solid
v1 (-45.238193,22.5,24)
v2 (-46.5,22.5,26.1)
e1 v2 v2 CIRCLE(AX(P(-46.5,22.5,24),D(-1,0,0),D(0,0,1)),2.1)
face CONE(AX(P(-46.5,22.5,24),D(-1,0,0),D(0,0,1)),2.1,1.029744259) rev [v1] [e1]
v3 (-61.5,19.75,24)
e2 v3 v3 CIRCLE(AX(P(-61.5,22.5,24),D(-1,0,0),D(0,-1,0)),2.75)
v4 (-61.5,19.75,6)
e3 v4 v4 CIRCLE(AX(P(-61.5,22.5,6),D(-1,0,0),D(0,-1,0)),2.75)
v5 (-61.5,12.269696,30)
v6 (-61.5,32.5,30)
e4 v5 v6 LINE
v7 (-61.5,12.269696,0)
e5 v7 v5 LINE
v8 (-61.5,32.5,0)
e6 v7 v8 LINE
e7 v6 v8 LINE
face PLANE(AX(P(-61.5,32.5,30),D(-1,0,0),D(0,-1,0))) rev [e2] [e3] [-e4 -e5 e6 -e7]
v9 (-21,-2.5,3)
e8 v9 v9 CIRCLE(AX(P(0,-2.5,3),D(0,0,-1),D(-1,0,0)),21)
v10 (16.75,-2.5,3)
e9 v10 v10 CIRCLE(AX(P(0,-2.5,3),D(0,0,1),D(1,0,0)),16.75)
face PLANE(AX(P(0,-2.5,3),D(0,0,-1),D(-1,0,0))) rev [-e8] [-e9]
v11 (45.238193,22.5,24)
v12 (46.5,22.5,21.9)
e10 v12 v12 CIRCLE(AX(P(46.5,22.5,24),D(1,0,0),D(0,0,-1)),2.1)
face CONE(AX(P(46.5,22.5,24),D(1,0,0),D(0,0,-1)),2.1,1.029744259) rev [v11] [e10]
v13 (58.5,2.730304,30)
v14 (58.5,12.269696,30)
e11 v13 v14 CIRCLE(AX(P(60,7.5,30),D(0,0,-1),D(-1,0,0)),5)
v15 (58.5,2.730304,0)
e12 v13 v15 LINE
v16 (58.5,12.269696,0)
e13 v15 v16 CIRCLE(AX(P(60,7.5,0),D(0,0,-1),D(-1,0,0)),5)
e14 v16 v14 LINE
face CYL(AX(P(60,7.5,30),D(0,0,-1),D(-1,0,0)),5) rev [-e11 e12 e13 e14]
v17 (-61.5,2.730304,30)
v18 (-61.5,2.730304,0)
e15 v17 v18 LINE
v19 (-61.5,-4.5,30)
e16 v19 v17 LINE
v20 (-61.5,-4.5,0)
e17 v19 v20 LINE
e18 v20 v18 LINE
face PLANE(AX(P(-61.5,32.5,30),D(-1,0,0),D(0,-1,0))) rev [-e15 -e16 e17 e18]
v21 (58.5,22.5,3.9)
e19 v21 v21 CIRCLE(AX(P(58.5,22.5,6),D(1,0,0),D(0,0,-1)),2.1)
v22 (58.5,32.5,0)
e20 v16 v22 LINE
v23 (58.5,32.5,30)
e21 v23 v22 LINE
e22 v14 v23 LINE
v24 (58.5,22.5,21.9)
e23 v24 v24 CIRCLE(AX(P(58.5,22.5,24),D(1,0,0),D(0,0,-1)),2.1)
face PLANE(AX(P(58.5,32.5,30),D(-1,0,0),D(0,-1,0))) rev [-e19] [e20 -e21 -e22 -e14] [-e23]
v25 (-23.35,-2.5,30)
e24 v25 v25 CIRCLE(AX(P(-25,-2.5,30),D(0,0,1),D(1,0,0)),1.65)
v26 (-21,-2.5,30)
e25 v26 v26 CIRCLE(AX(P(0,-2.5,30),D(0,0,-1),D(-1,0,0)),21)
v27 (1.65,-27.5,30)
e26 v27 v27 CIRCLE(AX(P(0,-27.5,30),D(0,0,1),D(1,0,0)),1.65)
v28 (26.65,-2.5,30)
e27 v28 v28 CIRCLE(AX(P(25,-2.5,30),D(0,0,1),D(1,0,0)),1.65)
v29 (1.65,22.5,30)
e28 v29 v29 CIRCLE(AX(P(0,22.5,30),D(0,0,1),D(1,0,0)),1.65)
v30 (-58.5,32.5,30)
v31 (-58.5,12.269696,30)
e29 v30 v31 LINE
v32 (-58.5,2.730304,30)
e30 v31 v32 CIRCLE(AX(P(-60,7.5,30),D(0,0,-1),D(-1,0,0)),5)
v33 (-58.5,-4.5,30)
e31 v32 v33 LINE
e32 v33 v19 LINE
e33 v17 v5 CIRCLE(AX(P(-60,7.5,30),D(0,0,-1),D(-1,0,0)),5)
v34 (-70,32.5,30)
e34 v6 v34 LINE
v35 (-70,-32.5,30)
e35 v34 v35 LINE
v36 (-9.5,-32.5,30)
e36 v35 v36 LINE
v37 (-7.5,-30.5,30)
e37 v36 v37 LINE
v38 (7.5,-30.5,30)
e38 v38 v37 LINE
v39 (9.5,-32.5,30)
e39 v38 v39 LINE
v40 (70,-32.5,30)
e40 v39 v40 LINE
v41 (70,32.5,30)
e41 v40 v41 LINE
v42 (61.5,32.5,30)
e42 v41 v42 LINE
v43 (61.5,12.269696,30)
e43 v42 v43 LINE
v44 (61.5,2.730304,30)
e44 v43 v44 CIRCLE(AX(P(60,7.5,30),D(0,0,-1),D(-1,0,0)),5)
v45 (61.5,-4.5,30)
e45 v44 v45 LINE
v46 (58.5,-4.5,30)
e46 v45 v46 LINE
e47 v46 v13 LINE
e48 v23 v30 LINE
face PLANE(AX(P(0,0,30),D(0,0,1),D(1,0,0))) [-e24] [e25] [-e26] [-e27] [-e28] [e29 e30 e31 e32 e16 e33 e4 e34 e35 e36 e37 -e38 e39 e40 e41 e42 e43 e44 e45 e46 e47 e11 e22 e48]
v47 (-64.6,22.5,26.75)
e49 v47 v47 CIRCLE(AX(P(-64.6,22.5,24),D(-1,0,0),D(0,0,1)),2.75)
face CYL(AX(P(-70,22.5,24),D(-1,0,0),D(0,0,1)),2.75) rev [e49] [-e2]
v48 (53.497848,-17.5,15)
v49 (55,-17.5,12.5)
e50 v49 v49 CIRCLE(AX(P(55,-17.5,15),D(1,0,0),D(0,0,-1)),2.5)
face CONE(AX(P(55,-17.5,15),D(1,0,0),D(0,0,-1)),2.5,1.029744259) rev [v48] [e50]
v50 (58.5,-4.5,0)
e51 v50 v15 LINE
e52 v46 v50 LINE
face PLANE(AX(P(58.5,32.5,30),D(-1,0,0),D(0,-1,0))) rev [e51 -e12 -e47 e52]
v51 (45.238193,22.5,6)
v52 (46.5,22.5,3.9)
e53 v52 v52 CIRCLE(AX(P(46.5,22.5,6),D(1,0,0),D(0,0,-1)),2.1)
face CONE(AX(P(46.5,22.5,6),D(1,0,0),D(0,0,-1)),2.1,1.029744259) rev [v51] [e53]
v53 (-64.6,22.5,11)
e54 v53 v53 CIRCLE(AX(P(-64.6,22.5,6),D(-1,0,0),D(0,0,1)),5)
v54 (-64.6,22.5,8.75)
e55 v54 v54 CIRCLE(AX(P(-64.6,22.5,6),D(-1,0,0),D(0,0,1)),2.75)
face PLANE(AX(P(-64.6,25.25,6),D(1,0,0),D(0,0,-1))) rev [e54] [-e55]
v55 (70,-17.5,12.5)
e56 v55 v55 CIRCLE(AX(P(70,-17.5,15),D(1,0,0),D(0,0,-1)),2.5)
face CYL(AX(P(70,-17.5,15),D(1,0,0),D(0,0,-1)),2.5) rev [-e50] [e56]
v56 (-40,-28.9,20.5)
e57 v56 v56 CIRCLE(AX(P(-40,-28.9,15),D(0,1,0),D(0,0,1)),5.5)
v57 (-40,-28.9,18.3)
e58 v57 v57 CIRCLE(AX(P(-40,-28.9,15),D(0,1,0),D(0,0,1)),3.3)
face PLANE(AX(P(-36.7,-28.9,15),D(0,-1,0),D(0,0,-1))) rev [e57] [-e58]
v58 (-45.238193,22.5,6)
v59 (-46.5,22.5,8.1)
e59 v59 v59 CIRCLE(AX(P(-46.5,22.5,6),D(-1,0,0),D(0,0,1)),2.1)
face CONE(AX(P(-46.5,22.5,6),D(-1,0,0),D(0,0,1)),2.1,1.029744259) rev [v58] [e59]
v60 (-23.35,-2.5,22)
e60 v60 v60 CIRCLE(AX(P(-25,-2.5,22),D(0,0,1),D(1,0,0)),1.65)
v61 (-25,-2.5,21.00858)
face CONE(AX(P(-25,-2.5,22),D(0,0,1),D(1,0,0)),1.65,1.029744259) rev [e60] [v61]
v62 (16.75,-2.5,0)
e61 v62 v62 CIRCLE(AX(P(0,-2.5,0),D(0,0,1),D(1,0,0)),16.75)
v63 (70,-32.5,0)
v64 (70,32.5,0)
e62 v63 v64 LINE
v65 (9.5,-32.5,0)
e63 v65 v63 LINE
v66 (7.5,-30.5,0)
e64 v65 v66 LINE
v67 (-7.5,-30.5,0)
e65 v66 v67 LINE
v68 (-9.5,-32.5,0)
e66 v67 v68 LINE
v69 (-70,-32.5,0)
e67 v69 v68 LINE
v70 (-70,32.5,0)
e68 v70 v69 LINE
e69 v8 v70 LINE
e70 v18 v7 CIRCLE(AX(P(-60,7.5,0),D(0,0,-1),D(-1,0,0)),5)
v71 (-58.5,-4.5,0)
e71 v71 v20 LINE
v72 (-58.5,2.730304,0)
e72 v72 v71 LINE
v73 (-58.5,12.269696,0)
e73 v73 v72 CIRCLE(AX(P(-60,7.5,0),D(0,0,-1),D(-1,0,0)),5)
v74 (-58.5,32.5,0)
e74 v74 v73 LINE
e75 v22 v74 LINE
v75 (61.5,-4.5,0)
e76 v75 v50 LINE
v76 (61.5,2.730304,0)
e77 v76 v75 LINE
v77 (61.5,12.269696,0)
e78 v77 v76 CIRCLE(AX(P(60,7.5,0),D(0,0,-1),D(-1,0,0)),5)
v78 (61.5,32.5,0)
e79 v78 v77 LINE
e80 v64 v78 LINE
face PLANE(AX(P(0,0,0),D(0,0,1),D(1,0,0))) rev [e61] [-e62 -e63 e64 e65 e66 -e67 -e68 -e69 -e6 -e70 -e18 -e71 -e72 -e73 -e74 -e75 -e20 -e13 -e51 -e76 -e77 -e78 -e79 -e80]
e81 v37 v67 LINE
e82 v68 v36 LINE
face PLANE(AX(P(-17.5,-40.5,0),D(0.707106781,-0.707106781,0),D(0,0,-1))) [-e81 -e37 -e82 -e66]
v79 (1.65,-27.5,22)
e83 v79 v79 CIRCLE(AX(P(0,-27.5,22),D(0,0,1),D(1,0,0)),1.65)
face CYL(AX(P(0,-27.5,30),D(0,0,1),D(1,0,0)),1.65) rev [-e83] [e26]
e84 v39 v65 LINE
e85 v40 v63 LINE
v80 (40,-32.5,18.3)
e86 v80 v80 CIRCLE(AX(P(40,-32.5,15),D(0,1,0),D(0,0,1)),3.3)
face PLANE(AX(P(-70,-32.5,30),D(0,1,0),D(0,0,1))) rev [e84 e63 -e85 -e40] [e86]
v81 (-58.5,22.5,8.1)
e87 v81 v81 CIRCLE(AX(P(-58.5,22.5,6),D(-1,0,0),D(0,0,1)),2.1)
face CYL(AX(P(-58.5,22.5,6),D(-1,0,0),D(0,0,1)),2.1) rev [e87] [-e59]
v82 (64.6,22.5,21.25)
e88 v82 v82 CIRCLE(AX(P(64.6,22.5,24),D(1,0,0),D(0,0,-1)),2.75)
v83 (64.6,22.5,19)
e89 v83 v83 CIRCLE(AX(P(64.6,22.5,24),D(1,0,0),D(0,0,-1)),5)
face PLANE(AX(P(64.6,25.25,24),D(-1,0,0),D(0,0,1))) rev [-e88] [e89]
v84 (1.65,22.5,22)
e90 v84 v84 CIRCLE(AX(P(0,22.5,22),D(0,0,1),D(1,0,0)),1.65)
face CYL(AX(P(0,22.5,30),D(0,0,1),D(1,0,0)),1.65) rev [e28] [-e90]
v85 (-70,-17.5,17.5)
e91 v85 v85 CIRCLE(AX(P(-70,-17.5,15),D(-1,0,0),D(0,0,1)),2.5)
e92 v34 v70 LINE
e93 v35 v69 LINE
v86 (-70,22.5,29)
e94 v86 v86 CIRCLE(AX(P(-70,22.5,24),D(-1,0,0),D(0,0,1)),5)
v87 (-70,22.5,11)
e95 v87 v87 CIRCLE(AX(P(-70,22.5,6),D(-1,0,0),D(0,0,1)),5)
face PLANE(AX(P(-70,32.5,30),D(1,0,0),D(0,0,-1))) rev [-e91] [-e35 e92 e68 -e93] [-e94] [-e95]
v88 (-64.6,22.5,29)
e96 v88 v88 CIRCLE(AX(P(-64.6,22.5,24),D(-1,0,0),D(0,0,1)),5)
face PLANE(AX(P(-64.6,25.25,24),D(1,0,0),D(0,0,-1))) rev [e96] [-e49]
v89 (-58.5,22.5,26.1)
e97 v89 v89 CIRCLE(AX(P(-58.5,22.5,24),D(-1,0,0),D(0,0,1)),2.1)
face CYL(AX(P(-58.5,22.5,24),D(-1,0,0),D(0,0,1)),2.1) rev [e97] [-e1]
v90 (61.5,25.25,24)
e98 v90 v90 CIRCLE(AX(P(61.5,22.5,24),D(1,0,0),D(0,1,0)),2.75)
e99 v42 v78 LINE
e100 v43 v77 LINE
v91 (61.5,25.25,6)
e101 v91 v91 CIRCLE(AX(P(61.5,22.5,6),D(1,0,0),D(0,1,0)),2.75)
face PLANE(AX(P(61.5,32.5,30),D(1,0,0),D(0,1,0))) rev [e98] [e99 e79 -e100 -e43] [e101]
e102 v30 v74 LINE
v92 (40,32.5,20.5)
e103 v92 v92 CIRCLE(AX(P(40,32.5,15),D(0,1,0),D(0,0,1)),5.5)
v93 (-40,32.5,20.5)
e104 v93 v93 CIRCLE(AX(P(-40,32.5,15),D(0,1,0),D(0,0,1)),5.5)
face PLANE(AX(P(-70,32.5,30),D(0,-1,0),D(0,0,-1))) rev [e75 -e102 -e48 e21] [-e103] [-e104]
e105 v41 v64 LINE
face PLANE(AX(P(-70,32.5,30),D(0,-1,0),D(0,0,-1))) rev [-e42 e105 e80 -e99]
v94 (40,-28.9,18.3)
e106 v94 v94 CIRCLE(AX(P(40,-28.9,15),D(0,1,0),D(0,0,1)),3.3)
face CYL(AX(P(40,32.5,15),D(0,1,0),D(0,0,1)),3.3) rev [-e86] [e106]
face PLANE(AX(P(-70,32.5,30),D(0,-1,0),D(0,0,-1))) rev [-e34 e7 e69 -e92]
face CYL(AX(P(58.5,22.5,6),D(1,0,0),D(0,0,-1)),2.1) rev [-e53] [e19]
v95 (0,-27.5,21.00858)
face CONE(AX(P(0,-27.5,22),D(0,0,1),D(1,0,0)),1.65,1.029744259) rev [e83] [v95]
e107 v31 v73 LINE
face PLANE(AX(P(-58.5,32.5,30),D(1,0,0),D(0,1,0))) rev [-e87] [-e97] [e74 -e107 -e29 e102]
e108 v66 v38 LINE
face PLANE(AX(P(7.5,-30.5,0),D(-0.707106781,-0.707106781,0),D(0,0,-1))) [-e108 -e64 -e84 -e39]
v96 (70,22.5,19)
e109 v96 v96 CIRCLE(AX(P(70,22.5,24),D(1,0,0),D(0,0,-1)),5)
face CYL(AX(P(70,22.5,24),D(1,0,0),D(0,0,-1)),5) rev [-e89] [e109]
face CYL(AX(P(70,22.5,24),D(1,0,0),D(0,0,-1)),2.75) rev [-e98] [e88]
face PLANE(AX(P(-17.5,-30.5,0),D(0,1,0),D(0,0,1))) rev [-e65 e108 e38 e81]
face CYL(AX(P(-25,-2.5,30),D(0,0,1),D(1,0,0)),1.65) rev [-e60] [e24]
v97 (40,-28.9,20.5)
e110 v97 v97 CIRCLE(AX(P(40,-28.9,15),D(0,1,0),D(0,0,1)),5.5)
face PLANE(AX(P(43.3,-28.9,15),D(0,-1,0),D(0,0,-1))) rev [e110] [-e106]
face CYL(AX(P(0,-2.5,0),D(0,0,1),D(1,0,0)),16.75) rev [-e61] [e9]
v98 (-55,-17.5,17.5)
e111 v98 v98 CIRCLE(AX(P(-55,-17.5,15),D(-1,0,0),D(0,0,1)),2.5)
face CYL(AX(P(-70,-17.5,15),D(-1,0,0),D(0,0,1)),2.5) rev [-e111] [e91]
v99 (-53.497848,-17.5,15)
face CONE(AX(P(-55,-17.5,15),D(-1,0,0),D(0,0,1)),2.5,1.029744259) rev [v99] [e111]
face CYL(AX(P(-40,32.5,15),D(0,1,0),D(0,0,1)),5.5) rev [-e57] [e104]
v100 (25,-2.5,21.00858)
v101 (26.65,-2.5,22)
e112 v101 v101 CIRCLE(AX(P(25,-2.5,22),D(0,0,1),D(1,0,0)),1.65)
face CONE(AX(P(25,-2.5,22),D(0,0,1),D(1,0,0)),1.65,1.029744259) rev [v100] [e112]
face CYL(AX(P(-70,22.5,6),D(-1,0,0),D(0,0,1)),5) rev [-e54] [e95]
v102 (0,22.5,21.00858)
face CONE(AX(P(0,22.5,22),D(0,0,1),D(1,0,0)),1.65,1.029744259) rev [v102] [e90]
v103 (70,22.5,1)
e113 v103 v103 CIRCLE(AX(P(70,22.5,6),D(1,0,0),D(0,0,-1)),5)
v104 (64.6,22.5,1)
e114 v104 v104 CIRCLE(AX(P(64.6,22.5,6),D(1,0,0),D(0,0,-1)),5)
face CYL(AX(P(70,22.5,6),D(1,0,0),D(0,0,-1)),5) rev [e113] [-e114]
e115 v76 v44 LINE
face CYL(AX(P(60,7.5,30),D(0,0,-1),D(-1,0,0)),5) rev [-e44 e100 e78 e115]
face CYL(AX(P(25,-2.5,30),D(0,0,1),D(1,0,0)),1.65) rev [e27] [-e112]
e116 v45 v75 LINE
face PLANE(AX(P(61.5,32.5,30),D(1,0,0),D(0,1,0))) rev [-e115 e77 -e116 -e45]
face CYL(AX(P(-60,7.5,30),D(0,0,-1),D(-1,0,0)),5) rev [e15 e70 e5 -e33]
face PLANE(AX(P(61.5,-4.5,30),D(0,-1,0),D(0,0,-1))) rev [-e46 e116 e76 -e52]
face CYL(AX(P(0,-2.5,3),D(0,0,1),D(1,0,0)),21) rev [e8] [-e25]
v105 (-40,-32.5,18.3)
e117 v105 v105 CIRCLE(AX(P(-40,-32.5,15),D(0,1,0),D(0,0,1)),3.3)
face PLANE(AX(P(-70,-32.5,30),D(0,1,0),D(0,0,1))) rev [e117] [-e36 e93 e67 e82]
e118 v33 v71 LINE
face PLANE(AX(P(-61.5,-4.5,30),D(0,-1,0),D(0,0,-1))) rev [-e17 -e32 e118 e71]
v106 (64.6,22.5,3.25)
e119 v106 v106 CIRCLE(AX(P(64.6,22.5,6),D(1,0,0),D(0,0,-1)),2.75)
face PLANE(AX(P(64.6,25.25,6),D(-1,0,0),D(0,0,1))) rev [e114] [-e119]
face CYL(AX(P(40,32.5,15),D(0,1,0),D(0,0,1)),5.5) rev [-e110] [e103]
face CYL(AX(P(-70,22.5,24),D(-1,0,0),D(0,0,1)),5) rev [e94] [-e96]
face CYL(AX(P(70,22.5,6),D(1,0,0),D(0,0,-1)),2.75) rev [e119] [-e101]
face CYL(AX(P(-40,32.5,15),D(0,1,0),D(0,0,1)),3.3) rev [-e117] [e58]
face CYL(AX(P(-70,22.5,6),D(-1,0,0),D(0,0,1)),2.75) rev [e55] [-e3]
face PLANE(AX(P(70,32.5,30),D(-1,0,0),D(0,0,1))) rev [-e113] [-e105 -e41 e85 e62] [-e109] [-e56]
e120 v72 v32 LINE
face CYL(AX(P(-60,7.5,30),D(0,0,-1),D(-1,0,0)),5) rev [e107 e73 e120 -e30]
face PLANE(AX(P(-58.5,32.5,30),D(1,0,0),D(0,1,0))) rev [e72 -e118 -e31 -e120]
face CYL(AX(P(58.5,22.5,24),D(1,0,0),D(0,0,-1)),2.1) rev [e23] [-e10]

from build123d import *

# Parameters (mm, degrees)
SKETCH1_W                                           = 140
SKETCH1_H                                           = 65
BOSS_EXTRUDE1_DEPTH                                 = 30
SKETCH2_R                                           = 21
CUT_EXTRUDE2_DEPTH                                  = 27
SKETCH4_R                                           = 16.75
CUT_EXTRUDE3_DEPTH                                  = 82.76337811
SKETCH5_R                                           = 5
CUT_EXTRUDE4_DEPTH                                  = 83.802475808
SKETCH6_W                                           = 3
SKETCH6_H                                           = 37
CUT_EXTRUDE5_DEPTH                                  = 83.802475808
CBORE_FOR_M5_HEX_SOCKET_HEAD_CAP_SCREW1_D           = 5.5
CBORE_FOR_M5_HEX_SOCKET_HEAD_CAP_SCREW1_DEPTH       = 8.5
CBORE_FOR_M5_HEX_SOCKET_HEAD_CAP_SCREW1_CBORE_D     = 10
CBORE_FOR_M5_HEX_SOCKET_HEAD_CAP_SCREW1_CBORE_DEPTH = 5.4
TAP_DRILL_FOR_M5_TAP1_AT_2_COUNT                    = 2
TAP_DRILL_FOR_M5_TAP1_AT_2_PITCH                    = 18
CBORE_FOR_M6_HEX_SOCKET_HEAD_CAP_SCREW3_D           = 6.6
CBORE_FOR_M6_HEX_SOCKET_HEAD_CAP_SCREW3_CBORE_D     = 11
CBORE_FOR_M6_HEX_SOCKET_HEAD_CAP_SCREW3_CBORE_DEPTH = 61.4
CIRPATTERN1_COUNT                                   = 4
SKETCH29_W                                          = 35
SKETCH29_H                                          = 2
CUT_EXTRUDE6_DEPTH                                  = 83.802475808
CHAMFER2_SIZE                                       = 10


with BuildPart() as part:
    # Sketch1 → Boss-Extrude1 (new body)
    with BuildSketch(Plane.XY):
        Rectangle(SKETCH1_W, SKETCH1_H)
    extrude(amount=BOSS_EXTRUDE1_DEPTH)

    # Sketch2 → Cut-Extrude2 (cut)
    with BuildSketch(Plane(origin=(0, 0, 30), x_dir=(-1, 0, 0), z_dir=(0, 0, -1))):
        with Locations((0, -2.5)):
            Circle(SKETCH2_R)
    extrude(amount=CUT_EXTRUDE2_DEPTH, mode=Mode.SUBTRACT)

    # Sketch4 → Cut-Extrude3 (cut, through all)
    with BuildSketch(Plane.XY.offset(3)):
        with Locations((0, -2.5)):
            Circle(SKETCH4_R)
    extrude(amount=-CUT_EXTRUDE3_DEPTH, mode=Mode.SUBTRACT)

    # Sketch5 → Cut-Extrude4 (cut, through all)
    with BuildSketch(Plane(origin=(0, 0, 0), x_dir=(-1, 0, 0), z_dir=(0, 0, -1))):
        with Locations((-60, 7.5)):
            Circle(SKETCH5_R)
        with Locations((60, 7.5)):
            Circle(SKETCH5_R)
    extrude(amount=-CUT_EXTRUDE4_DEPTH, mode=Mode.SUBTRACT)

    # Sketch6 → Cut-Extrude5 (cut, through all)
    with BuildSketch(Plane(origin=(0, 0, 0), x_dir=(-1, 0, 0), z_dir=(0, 0, -1))):
        with Locations((-60, 14)):
            Rectangle(SKETCH6_W, SKETCH6_H)
        with Locations((60, 14)):
            Rectangle(SKETCH6_W, SKETCH6_H)
    extrude(amount=-CUT_EXTRUDE5_DEPTH, mode=Mode.SUBTRACT)

    # CBORE for M5 Hex Socket Head Cap Screw1
    with Locations(Plane(origin=(70, 0, 0), x_dir=(0, 0, -1), z_dir=(1, 0, 0))):
        with Locations((-6, 22.5), (-24, 22.5)):
            cbore_for_m5_hex_socket_head_cap_screw1 = CounterBoreHole(CBORE_FOR_M5_HEX_SOCKET_HEAD_CAP_SCREW1_D / 2, CBORE_FOR_M5_HEX_SOCKET_HEAD_CAP_SCREW1_CBORE_D / 2, CBORE_FOR_M5_HEX_SOCKET_HEAD_CAP_SCREW1_CBORE_DEPTH, depth=CBORE_FOR_M5_HEX_SOCKET_HEAD_CAP_SCREW1_DEPTH)

    # Sketch12 → Tap Drill for M5 Tap1 (revolve, cut)
    with BuildSketch(Plane(origin=(58.5, 22.5, 6), x_dir=(0, 0, -1), z_dir=(0, 1, 0))):
        Polygon((0, 0), (0, 13.2618073), (2.1, 12), (2.1, 0), align=None)
    tap_drill_for_m5_tap1 = revolve(axis=Axis((64.85, 22.5, 6), (-1, 0, 0)), mode=Mode.SUBTRACT)

    # Tap Drill for M5 Tap1 at 2: Tap Drill for M5 Tap1 ×2
    with Locations(*[(0, 0, i * TAP_DRILL_FOR_M5_TAP1_AT_2_PITCH) for i in range(1, TAP_DRILL_FOR_M5_TAP1_AT_2_COUNT)]):
        add(tap_drill_for_m5_tap1, mode=Mode.SUBTRACT)

    # Sketch15 → Tap Drill for M6 Tap1 (revolve, cut)
    with BuildSketch(Plane(origin=(70, -17.5, 15), x_dir=(0, 0, -1), z_dir=(0, 1, 0))):
        Polygon((0, 0), (0, 16.502151548), (2.5, 15), (2.5, 0), align=None)
    tap_drill_for_m6_tap1 = revolve(axis=Axis((76.35, -17.5, 15), (-1, 0, 0)), mode=Mode.SUBTRACT)

    # Mirror1: CBORE for M5 Hex Socket Head Cap Screw1, Tap Drill for M5 Tap1, Tap Drill for M6 Tap1 across plane
    add(cbore_for_m5_hex_socket_head_cap_screw1.mirror(Plane(origin=(0, 0, 0), x_dir=(0, 0, 1), z_dir=(1, 0, 0))), mode=Mode.SUBTRACT)
    add(tap_drill_for_m5_tap1.mirror(Plane(origin=(0, 0, 0), x_dir=(0, 0, 1), z_dir=(1, 0, 0))), mode=Mode.SUBTRACT)
    add(tap_drill_for_m6_tap1.mirror(Plane(origin=(0, 0, 0), x_dir=(0, 0, 1), z_dir=(1, 0, 0))), mode=Mode.SUBTRACT)

    # Mirror1 copy 1 sketch → Mirror1 copy 1 (revolve, cut)
    with BuildSketch(Plane(origin=(-58.5, 22.5, 24), x_dir=(0, 0, -1), z_dir=(0, 1, 0))):
        Polygon((0, 0), (0, -13.2618073), (2.1, -12), (2.1, 0), align=None)
    revolve(axis=Axis((-64.85, 22.5, 24), (-1, 0, 0)), mode=Mode.SUBTRACT)

    # CBORE for M6 Hex Socket Head Cap Screw3 (through all)
    with Locations(Plane(origin=(0, 32.5, 0), x_dir=(1, 0, 0), z_dir=(0, 1, 0))):
        with Locations((40, -15), (-40, -15)):
            CounterBoreHole(CBORE_FOR_M6_HEX_SOCKET_HEAD_CAP_SCREW3_D / 2, CBORE_FOR_M6_HEX_SOCKET_HEAD_CAP_SCREW3_CBORE_D / 2, CBORE_FOR_M6_HEX_SOCKET_HEAD_CAP_SCREW3_CBORE_DEPTH)

    # Sketch28 → Tap Drill for M4 Tap1 (revolve, cut)
    with BuildSketch(Plane(origin=(0, 22.5, 30), x_dir=(0, -1, 0), z_dir=(1, 0, 0))):
        Polygon((0, 0), (0, 8.991420021), (1.65, 8), (1.65, 0), align=None)
    tap_drill_for_m4_tap1 = revolve(axis=Axis((0, 22.5, 36.35), (0, 0, -1)), mode=Mode.SUBTRACT)

    # CirPattern1: Tap Drill for M4 Tap1 ×4 about axis
    cirpattern1_axis = Axis((0, -2.5, 0), (0, 0, 1))
    for i in range(1, CIRPATTERN1_COUNT):
        add(tap_drill_for_m4_tap1.rotate(cirpattern1_axis, i * 360 / CIRPATTERN1_COUNT), mode=Mode.SUBTRACT)

    # Sketch29 → Cut-Extrude6 (cut, through all)
    with BuildSketch(Plane.XY.offset(30)):
        with Locations((0, -31.5)):
            Rectangle(SKETCH29_W, SKETCH29_H)
    extrude(amount=-CUT_EXTRUDE6_DEPTH, mode=Mode.SUBTRACT)

    # Chamfer2
    # the kernel refuses this chamfer: 10 mm, written as the material it adds along each edge
    with BuildSketch(Plane(origin=(-17.5, -30.5, 30), x_dir=(-0.02749587661058977, -0.9996219169112965, 0), z_dir=(0, 0, -1))) as chamfer2_piece_1_section:
        Polygon((CHAMFER2_SIZE * 0.999621916911, -CHAMFER2_SIZE * 0.0274958766106), (-CHAMFER2_SIZE * 0.0274958766106, -CHAMFER2_SIZE * 0.999621916911), (0, 0), align=None)
    chamfer2_piece_1 = extrude(amount=30, mode=Mode.PRIVATE)
    chamfer2_piece_1 = split(chamfer2_piece_1, bisect_by=Plane(origin=(-12.880949734, -32.5, 15), z_dir=(0, 1, 0)), keep=Keep.TOP, mode=Mode.PRIVATE)
    add(chamfer2_piece_1)
    with BuildSketch(Plane(origin=(17.5, -30.5, 30), x_dir=(-0.9996219169112968, 0.027495876610586317, 0), z_dir=(0, 0, -1))) as chamfer2_piece_2_section:
        Polygon((CHAMFER2_SIZE * 0.999621916911, -CHAMFER2_SIZE * 0.0274958766106), (-CHAMFER2_SIZE * 0.0274958766106, -CHAMFER2_SIZE * 0.999621916911), (0, 0), align=None)
    chamfer2_piece_2 = extrude(amount=30, mode=Mode.PRIVATE)
    chamfer2_piece_2 = split(chamfer2_piece_2, bisect_by=Plane(origin=(12.880949734, -32.5, 15), z_dir=(0, 1, 0)), keep=Keep.TOP, mode=Mode.PRIVATE)
    add(chamfer2_piece_2)


solid = part.part
